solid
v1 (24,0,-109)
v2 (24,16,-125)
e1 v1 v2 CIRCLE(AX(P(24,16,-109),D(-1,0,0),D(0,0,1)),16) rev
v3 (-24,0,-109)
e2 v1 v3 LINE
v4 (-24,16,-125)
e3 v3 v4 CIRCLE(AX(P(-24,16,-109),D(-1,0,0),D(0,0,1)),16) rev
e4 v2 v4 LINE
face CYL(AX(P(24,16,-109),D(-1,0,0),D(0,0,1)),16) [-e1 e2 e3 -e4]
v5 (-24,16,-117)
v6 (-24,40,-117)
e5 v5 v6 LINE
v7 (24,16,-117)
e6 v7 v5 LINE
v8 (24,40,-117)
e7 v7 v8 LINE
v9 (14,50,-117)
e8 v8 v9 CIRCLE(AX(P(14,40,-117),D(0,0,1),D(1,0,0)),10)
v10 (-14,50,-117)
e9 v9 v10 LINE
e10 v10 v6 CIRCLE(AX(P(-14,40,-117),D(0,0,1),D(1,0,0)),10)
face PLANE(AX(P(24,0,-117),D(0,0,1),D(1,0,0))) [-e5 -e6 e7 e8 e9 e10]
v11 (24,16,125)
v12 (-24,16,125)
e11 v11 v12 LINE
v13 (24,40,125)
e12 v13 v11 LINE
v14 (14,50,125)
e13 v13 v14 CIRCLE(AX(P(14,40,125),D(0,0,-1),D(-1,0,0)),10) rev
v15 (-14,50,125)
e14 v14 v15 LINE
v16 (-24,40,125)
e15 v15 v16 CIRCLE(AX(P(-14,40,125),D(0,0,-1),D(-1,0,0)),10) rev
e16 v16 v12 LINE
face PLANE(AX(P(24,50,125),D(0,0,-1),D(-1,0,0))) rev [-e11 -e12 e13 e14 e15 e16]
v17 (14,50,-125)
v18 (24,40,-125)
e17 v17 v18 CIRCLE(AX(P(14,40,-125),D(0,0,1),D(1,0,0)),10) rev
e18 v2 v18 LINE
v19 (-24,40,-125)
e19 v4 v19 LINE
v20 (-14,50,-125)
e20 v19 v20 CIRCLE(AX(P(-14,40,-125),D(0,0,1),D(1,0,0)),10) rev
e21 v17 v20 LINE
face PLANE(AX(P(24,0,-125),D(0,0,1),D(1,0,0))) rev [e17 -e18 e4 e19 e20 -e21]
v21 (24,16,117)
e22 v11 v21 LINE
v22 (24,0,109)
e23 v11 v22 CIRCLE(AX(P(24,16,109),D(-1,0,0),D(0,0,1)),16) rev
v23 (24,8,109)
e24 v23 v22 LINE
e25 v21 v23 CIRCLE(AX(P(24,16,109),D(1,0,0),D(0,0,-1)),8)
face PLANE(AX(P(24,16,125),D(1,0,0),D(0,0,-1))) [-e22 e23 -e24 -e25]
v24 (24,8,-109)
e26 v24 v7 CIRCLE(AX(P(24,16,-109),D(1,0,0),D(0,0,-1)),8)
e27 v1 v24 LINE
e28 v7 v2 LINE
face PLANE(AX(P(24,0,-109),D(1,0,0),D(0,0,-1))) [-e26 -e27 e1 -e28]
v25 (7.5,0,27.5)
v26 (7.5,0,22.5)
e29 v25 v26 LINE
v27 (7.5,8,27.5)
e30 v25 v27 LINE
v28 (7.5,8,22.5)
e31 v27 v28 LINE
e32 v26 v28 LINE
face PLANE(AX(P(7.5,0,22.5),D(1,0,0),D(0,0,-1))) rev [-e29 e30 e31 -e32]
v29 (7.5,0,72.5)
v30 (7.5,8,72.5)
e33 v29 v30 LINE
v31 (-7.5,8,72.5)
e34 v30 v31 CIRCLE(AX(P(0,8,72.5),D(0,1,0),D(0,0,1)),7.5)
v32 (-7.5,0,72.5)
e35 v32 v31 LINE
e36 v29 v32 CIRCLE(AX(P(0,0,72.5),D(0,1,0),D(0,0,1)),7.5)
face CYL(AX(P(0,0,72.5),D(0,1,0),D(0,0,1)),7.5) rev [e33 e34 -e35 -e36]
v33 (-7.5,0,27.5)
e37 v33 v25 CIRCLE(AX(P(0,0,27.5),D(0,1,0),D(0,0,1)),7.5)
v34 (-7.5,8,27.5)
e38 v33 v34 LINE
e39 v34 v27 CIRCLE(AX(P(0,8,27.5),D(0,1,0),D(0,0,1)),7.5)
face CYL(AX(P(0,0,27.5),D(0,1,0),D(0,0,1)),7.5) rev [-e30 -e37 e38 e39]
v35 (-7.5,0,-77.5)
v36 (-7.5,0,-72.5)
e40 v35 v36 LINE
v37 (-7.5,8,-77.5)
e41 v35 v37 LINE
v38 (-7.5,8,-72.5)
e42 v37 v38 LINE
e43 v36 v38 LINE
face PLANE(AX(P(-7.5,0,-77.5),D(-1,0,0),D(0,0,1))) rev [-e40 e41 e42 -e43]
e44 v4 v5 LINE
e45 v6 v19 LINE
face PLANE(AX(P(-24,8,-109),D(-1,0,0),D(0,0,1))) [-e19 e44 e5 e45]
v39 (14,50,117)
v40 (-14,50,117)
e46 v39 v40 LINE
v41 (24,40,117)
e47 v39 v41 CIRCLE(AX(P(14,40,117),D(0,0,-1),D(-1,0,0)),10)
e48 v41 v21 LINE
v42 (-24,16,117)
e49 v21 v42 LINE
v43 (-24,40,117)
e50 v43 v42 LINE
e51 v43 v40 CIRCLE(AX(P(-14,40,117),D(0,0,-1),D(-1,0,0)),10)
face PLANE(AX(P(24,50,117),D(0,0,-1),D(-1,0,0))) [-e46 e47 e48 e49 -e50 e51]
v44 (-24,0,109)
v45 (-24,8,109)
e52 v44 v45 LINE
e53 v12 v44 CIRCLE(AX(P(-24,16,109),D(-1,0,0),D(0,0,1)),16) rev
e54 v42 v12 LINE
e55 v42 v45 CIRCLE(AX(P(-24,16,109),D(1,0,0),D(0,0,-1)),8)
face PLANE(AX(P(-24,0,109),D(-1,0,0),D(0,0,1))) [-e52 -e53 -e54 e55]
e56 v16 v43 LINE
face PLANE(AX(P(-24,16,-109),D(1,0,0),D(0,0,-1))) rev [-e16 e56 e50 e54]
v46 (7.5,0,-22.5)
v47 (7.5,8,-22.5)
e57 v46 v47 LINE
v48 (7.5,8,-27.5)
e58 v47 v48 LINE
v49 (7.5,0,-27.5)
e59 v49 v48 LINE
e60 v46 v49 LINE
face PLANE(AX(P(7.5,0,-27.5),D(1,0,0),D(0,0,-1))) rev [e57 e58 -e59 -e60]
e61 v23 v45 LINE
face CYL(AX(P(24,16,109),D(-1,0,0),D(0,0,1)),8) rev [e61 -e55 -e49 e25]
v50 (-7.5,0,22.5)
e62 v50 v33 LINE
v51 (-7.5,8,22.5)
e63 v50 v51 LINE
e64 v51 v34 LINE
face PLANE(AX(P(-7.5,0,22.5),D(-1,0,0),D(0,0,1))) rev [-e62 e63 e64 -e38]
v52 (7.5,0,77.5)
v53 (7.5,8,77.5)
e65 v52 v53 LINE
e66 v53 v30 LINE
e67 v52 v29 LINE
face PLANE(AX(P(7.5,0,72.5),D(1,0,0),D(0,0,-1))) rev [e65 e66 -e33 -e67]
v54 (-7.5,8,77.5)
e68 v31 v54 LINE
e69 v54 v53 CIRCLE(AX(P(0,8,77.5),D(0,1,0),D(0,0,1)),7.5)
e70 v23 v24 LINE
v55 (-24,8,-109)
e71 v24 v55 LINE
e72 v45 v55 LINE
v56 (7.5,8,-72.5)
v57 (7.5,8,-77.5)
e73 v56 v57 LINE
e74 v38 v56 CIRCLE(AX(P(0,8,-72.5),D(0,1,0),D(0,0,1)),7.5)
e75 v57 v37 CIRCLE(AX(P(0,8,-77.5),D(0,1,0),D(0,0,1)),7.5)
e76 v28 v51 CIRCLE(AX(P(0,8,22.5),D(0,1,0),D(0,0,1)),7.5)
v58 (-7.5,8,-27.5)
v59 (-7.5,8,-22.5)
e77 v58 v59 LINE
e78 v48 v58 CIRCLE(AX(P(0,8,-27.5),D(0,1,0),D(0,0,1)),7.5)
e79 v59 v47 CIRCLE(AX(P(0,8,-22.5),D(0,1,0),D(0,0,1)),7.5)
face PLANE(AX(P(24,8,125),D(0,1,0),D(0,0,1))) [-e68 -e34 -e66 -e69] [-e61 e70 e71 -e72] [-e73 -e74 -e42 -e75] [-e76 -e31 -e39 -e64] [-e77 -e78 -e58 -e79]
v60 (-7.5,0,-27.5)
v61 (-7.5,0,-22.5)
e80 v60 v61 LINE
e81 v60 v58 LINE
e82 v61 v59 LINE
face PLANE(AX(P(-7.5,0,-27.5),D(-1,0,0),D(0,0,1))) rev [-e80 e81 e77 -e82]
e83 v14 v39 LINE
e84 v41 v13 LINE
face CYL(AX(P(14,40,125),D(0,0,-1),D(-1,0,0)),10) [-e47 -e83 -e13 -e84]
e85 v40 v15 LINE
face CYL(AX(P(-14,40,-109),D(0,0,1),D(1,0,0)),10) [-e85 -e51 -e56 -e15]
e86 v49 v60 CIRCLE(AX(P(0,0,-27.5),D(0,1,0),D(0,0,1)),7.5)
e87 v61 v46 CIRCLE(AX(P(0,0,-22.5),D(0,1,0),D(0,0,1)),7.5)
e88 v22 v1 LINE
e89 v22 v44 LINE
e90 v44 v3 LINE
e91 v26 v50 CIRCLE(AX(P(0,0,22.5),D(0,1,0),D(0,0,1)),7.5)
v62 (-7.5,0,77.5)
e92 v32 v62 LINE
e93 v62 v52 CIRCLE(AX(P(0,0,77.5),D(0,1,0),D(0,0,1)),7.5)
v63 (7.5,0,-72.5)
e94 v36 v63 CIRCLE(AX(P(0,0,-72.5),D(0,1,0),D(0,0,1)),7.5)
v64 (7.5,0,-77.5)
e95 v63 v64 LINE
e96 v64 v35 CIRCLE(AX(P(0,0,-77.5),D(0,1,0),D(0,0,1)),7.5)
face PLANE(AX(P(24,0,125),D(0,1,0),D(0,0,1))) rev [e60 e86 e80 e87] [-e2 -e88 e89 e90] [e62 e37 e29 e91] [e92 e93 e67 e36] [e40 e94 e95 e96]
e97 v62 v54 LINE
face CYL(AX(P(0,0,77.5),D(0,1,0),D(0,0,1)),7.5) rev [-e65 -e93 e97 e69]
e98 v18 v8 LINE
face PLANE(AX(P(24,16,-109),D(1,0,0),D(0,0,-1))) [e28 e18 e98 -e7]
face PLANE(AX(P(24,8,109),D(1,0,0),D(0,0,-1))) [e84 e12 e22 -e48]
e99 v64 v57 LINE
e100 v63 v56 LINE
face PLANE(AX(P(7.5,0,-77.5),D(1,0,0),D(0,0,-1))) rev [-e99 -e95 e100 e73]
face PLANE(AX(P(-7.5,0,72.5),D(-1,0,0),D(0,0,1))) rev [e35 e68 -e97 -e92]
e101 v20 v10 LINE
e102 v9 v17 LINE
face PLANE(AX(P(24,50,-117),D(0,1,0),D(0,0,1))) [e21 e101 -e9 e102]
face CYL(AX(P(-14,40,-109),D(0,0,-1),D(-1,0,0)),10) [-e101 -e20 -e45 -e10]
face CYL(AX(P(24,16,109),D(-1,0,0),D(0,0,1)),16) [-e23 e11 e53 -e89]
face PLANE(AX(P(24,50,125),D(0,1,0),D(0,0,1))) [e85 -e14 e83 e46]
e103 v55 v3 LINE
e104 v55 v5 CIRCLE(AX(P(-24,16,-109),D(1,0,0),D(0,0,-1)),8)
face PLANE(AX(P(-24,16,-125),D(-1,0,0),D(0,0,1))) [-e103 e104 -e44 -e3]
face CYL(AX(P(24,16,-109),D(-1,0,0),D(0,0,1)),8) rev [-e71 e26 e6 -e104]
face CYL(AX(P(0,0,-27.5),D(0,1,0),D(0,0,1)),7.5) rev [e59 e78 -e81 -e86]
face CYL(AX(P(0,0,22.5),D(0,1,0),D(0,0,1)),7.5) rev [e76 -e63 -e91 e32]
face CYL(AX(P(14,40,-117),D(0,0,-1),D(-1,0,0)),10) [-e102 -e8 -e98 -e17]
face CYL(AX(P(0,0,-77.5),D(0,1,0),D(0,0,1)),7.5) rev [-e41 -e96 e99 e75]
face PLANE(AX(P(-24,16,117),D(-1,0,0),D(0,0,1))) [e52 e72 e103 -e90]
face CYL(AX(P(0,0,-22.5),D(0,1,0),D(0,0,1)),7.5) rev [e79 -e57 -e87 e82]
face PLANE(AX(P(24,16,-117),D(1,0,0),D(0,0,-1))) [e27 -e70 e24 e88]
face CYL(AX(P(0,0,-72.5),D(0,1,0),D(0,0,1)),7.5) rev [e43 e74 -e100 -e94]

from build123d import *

# Parameters (mm, degrees)
SM_BASE_FLANGE_1_DEPTH = 24
CUT_EXTRUDE_1_DEPTH    = 135.033577883
FILLET_1_R             = 10


# Sheet-metal steps are written as plain solids
with BuildPart() as part:
    # Sketch 1 → 基体-法兰1 (new, symmetric)
    with BuildSketch(Plane(origin=(0, 0, 0), x_dir=(0, 0, -1), z_dir=(1, 0, 0))):
        with BuildLine():
            Line((-125, 50), (-125, 16))
            ThreePointArc((-125, 16), (-120.313708499, 4.686291501), (-109, 0))
            Line((-109, 0), (109, 0))
            ThreePointArc((109, 0), (120.313708499, 4.686291501), (125, 16))
            Line((125, 16), (125, 50))
            Line((125, 50), (117, 50))
            Line((117, 50), (117, 16))
            ThreePointArc((117, 16), (114.656854249, 10.343145751), (109, 8))
            Line((109, 8), (-109, 8))
            ThreePointArc((-109, 8), (-114.656854249, 10.343145751), (-117, 16))
            Line((-117, 16), (-117, 50))
            Line((-117, 50), (-125, 50))
        make_face()
    extrude(amount=SM_BASE_FLANGE_1_DEPTH, both=True)

    # 草图6 → 切除-拉伸1 (cut, through all)
    with BuildSketch(Plane(origin=(0, 8, 0), x_dir=(1, 0, 0), z_dir=(0, 1, 0))):
        with BuildLine():
            Line((7.5, 77.5), (7.5, 72.5))
            ThreePointArc((7.5, 72.5), (0, 65), (-7.5, 72.5))
            Line((-7.5, 72.5), (-7.5, 77.5))
            ThreePointArc((-7.5, 77.5), (0, 85), (7.5, 77.5))
        make_face()
        with BuildLine():
            Line((7.5, 27.5), (7.5, 22.5))
            ThreePointArc((7.5, 22.5), (0, 15), (-7.5, 22.5))
            Line((-7.5, 22.5), (-7.5, 27.5))
            ThreePointArc((-7.5, 27.5), (0, 35), (7.5, 27.5))
        make_face()
        with BuildLine():
            Line((7.5, -22.5), (7.5, -27.5))
            ThreePointArc((7.5, -27.5), (0, -35), (-7.5, -27.5))
            Line((-7.5, -27.5), (-7.5, -22.5))
            ThreePointArc((-7.5, -22.5), (0, -15), (7.5, -22.5))
        make_face()
        with BuildLine():
            Line((7.5, -72.5), (7.5, -77.5))
            ThreePointArc((7.5, -77.5), (0, -85), (-7.5, -77.5))
            Line((-7.5, -77.5), (-7.5, -72.5))
            ThreePointArc((-7.5, -72.5), (0, -65), (7.5, -72.5))
        make_face()
    extrude(amount=-CUT_EXTRUDE_1_DEPTH, mode=Mode.SUBTRACT)

    # 圆角1
    fillet_1_edges = [part.edges().sort_by_distance(p)[0] for p in [
        (-24, 50, 121),
        (-24, 50, -121),
        (24, 50, 121),
        (24, 50, -121),
    ]]
    fillet(fillet_1_edges, radius=FILLET_1_R)


solid = part.part
